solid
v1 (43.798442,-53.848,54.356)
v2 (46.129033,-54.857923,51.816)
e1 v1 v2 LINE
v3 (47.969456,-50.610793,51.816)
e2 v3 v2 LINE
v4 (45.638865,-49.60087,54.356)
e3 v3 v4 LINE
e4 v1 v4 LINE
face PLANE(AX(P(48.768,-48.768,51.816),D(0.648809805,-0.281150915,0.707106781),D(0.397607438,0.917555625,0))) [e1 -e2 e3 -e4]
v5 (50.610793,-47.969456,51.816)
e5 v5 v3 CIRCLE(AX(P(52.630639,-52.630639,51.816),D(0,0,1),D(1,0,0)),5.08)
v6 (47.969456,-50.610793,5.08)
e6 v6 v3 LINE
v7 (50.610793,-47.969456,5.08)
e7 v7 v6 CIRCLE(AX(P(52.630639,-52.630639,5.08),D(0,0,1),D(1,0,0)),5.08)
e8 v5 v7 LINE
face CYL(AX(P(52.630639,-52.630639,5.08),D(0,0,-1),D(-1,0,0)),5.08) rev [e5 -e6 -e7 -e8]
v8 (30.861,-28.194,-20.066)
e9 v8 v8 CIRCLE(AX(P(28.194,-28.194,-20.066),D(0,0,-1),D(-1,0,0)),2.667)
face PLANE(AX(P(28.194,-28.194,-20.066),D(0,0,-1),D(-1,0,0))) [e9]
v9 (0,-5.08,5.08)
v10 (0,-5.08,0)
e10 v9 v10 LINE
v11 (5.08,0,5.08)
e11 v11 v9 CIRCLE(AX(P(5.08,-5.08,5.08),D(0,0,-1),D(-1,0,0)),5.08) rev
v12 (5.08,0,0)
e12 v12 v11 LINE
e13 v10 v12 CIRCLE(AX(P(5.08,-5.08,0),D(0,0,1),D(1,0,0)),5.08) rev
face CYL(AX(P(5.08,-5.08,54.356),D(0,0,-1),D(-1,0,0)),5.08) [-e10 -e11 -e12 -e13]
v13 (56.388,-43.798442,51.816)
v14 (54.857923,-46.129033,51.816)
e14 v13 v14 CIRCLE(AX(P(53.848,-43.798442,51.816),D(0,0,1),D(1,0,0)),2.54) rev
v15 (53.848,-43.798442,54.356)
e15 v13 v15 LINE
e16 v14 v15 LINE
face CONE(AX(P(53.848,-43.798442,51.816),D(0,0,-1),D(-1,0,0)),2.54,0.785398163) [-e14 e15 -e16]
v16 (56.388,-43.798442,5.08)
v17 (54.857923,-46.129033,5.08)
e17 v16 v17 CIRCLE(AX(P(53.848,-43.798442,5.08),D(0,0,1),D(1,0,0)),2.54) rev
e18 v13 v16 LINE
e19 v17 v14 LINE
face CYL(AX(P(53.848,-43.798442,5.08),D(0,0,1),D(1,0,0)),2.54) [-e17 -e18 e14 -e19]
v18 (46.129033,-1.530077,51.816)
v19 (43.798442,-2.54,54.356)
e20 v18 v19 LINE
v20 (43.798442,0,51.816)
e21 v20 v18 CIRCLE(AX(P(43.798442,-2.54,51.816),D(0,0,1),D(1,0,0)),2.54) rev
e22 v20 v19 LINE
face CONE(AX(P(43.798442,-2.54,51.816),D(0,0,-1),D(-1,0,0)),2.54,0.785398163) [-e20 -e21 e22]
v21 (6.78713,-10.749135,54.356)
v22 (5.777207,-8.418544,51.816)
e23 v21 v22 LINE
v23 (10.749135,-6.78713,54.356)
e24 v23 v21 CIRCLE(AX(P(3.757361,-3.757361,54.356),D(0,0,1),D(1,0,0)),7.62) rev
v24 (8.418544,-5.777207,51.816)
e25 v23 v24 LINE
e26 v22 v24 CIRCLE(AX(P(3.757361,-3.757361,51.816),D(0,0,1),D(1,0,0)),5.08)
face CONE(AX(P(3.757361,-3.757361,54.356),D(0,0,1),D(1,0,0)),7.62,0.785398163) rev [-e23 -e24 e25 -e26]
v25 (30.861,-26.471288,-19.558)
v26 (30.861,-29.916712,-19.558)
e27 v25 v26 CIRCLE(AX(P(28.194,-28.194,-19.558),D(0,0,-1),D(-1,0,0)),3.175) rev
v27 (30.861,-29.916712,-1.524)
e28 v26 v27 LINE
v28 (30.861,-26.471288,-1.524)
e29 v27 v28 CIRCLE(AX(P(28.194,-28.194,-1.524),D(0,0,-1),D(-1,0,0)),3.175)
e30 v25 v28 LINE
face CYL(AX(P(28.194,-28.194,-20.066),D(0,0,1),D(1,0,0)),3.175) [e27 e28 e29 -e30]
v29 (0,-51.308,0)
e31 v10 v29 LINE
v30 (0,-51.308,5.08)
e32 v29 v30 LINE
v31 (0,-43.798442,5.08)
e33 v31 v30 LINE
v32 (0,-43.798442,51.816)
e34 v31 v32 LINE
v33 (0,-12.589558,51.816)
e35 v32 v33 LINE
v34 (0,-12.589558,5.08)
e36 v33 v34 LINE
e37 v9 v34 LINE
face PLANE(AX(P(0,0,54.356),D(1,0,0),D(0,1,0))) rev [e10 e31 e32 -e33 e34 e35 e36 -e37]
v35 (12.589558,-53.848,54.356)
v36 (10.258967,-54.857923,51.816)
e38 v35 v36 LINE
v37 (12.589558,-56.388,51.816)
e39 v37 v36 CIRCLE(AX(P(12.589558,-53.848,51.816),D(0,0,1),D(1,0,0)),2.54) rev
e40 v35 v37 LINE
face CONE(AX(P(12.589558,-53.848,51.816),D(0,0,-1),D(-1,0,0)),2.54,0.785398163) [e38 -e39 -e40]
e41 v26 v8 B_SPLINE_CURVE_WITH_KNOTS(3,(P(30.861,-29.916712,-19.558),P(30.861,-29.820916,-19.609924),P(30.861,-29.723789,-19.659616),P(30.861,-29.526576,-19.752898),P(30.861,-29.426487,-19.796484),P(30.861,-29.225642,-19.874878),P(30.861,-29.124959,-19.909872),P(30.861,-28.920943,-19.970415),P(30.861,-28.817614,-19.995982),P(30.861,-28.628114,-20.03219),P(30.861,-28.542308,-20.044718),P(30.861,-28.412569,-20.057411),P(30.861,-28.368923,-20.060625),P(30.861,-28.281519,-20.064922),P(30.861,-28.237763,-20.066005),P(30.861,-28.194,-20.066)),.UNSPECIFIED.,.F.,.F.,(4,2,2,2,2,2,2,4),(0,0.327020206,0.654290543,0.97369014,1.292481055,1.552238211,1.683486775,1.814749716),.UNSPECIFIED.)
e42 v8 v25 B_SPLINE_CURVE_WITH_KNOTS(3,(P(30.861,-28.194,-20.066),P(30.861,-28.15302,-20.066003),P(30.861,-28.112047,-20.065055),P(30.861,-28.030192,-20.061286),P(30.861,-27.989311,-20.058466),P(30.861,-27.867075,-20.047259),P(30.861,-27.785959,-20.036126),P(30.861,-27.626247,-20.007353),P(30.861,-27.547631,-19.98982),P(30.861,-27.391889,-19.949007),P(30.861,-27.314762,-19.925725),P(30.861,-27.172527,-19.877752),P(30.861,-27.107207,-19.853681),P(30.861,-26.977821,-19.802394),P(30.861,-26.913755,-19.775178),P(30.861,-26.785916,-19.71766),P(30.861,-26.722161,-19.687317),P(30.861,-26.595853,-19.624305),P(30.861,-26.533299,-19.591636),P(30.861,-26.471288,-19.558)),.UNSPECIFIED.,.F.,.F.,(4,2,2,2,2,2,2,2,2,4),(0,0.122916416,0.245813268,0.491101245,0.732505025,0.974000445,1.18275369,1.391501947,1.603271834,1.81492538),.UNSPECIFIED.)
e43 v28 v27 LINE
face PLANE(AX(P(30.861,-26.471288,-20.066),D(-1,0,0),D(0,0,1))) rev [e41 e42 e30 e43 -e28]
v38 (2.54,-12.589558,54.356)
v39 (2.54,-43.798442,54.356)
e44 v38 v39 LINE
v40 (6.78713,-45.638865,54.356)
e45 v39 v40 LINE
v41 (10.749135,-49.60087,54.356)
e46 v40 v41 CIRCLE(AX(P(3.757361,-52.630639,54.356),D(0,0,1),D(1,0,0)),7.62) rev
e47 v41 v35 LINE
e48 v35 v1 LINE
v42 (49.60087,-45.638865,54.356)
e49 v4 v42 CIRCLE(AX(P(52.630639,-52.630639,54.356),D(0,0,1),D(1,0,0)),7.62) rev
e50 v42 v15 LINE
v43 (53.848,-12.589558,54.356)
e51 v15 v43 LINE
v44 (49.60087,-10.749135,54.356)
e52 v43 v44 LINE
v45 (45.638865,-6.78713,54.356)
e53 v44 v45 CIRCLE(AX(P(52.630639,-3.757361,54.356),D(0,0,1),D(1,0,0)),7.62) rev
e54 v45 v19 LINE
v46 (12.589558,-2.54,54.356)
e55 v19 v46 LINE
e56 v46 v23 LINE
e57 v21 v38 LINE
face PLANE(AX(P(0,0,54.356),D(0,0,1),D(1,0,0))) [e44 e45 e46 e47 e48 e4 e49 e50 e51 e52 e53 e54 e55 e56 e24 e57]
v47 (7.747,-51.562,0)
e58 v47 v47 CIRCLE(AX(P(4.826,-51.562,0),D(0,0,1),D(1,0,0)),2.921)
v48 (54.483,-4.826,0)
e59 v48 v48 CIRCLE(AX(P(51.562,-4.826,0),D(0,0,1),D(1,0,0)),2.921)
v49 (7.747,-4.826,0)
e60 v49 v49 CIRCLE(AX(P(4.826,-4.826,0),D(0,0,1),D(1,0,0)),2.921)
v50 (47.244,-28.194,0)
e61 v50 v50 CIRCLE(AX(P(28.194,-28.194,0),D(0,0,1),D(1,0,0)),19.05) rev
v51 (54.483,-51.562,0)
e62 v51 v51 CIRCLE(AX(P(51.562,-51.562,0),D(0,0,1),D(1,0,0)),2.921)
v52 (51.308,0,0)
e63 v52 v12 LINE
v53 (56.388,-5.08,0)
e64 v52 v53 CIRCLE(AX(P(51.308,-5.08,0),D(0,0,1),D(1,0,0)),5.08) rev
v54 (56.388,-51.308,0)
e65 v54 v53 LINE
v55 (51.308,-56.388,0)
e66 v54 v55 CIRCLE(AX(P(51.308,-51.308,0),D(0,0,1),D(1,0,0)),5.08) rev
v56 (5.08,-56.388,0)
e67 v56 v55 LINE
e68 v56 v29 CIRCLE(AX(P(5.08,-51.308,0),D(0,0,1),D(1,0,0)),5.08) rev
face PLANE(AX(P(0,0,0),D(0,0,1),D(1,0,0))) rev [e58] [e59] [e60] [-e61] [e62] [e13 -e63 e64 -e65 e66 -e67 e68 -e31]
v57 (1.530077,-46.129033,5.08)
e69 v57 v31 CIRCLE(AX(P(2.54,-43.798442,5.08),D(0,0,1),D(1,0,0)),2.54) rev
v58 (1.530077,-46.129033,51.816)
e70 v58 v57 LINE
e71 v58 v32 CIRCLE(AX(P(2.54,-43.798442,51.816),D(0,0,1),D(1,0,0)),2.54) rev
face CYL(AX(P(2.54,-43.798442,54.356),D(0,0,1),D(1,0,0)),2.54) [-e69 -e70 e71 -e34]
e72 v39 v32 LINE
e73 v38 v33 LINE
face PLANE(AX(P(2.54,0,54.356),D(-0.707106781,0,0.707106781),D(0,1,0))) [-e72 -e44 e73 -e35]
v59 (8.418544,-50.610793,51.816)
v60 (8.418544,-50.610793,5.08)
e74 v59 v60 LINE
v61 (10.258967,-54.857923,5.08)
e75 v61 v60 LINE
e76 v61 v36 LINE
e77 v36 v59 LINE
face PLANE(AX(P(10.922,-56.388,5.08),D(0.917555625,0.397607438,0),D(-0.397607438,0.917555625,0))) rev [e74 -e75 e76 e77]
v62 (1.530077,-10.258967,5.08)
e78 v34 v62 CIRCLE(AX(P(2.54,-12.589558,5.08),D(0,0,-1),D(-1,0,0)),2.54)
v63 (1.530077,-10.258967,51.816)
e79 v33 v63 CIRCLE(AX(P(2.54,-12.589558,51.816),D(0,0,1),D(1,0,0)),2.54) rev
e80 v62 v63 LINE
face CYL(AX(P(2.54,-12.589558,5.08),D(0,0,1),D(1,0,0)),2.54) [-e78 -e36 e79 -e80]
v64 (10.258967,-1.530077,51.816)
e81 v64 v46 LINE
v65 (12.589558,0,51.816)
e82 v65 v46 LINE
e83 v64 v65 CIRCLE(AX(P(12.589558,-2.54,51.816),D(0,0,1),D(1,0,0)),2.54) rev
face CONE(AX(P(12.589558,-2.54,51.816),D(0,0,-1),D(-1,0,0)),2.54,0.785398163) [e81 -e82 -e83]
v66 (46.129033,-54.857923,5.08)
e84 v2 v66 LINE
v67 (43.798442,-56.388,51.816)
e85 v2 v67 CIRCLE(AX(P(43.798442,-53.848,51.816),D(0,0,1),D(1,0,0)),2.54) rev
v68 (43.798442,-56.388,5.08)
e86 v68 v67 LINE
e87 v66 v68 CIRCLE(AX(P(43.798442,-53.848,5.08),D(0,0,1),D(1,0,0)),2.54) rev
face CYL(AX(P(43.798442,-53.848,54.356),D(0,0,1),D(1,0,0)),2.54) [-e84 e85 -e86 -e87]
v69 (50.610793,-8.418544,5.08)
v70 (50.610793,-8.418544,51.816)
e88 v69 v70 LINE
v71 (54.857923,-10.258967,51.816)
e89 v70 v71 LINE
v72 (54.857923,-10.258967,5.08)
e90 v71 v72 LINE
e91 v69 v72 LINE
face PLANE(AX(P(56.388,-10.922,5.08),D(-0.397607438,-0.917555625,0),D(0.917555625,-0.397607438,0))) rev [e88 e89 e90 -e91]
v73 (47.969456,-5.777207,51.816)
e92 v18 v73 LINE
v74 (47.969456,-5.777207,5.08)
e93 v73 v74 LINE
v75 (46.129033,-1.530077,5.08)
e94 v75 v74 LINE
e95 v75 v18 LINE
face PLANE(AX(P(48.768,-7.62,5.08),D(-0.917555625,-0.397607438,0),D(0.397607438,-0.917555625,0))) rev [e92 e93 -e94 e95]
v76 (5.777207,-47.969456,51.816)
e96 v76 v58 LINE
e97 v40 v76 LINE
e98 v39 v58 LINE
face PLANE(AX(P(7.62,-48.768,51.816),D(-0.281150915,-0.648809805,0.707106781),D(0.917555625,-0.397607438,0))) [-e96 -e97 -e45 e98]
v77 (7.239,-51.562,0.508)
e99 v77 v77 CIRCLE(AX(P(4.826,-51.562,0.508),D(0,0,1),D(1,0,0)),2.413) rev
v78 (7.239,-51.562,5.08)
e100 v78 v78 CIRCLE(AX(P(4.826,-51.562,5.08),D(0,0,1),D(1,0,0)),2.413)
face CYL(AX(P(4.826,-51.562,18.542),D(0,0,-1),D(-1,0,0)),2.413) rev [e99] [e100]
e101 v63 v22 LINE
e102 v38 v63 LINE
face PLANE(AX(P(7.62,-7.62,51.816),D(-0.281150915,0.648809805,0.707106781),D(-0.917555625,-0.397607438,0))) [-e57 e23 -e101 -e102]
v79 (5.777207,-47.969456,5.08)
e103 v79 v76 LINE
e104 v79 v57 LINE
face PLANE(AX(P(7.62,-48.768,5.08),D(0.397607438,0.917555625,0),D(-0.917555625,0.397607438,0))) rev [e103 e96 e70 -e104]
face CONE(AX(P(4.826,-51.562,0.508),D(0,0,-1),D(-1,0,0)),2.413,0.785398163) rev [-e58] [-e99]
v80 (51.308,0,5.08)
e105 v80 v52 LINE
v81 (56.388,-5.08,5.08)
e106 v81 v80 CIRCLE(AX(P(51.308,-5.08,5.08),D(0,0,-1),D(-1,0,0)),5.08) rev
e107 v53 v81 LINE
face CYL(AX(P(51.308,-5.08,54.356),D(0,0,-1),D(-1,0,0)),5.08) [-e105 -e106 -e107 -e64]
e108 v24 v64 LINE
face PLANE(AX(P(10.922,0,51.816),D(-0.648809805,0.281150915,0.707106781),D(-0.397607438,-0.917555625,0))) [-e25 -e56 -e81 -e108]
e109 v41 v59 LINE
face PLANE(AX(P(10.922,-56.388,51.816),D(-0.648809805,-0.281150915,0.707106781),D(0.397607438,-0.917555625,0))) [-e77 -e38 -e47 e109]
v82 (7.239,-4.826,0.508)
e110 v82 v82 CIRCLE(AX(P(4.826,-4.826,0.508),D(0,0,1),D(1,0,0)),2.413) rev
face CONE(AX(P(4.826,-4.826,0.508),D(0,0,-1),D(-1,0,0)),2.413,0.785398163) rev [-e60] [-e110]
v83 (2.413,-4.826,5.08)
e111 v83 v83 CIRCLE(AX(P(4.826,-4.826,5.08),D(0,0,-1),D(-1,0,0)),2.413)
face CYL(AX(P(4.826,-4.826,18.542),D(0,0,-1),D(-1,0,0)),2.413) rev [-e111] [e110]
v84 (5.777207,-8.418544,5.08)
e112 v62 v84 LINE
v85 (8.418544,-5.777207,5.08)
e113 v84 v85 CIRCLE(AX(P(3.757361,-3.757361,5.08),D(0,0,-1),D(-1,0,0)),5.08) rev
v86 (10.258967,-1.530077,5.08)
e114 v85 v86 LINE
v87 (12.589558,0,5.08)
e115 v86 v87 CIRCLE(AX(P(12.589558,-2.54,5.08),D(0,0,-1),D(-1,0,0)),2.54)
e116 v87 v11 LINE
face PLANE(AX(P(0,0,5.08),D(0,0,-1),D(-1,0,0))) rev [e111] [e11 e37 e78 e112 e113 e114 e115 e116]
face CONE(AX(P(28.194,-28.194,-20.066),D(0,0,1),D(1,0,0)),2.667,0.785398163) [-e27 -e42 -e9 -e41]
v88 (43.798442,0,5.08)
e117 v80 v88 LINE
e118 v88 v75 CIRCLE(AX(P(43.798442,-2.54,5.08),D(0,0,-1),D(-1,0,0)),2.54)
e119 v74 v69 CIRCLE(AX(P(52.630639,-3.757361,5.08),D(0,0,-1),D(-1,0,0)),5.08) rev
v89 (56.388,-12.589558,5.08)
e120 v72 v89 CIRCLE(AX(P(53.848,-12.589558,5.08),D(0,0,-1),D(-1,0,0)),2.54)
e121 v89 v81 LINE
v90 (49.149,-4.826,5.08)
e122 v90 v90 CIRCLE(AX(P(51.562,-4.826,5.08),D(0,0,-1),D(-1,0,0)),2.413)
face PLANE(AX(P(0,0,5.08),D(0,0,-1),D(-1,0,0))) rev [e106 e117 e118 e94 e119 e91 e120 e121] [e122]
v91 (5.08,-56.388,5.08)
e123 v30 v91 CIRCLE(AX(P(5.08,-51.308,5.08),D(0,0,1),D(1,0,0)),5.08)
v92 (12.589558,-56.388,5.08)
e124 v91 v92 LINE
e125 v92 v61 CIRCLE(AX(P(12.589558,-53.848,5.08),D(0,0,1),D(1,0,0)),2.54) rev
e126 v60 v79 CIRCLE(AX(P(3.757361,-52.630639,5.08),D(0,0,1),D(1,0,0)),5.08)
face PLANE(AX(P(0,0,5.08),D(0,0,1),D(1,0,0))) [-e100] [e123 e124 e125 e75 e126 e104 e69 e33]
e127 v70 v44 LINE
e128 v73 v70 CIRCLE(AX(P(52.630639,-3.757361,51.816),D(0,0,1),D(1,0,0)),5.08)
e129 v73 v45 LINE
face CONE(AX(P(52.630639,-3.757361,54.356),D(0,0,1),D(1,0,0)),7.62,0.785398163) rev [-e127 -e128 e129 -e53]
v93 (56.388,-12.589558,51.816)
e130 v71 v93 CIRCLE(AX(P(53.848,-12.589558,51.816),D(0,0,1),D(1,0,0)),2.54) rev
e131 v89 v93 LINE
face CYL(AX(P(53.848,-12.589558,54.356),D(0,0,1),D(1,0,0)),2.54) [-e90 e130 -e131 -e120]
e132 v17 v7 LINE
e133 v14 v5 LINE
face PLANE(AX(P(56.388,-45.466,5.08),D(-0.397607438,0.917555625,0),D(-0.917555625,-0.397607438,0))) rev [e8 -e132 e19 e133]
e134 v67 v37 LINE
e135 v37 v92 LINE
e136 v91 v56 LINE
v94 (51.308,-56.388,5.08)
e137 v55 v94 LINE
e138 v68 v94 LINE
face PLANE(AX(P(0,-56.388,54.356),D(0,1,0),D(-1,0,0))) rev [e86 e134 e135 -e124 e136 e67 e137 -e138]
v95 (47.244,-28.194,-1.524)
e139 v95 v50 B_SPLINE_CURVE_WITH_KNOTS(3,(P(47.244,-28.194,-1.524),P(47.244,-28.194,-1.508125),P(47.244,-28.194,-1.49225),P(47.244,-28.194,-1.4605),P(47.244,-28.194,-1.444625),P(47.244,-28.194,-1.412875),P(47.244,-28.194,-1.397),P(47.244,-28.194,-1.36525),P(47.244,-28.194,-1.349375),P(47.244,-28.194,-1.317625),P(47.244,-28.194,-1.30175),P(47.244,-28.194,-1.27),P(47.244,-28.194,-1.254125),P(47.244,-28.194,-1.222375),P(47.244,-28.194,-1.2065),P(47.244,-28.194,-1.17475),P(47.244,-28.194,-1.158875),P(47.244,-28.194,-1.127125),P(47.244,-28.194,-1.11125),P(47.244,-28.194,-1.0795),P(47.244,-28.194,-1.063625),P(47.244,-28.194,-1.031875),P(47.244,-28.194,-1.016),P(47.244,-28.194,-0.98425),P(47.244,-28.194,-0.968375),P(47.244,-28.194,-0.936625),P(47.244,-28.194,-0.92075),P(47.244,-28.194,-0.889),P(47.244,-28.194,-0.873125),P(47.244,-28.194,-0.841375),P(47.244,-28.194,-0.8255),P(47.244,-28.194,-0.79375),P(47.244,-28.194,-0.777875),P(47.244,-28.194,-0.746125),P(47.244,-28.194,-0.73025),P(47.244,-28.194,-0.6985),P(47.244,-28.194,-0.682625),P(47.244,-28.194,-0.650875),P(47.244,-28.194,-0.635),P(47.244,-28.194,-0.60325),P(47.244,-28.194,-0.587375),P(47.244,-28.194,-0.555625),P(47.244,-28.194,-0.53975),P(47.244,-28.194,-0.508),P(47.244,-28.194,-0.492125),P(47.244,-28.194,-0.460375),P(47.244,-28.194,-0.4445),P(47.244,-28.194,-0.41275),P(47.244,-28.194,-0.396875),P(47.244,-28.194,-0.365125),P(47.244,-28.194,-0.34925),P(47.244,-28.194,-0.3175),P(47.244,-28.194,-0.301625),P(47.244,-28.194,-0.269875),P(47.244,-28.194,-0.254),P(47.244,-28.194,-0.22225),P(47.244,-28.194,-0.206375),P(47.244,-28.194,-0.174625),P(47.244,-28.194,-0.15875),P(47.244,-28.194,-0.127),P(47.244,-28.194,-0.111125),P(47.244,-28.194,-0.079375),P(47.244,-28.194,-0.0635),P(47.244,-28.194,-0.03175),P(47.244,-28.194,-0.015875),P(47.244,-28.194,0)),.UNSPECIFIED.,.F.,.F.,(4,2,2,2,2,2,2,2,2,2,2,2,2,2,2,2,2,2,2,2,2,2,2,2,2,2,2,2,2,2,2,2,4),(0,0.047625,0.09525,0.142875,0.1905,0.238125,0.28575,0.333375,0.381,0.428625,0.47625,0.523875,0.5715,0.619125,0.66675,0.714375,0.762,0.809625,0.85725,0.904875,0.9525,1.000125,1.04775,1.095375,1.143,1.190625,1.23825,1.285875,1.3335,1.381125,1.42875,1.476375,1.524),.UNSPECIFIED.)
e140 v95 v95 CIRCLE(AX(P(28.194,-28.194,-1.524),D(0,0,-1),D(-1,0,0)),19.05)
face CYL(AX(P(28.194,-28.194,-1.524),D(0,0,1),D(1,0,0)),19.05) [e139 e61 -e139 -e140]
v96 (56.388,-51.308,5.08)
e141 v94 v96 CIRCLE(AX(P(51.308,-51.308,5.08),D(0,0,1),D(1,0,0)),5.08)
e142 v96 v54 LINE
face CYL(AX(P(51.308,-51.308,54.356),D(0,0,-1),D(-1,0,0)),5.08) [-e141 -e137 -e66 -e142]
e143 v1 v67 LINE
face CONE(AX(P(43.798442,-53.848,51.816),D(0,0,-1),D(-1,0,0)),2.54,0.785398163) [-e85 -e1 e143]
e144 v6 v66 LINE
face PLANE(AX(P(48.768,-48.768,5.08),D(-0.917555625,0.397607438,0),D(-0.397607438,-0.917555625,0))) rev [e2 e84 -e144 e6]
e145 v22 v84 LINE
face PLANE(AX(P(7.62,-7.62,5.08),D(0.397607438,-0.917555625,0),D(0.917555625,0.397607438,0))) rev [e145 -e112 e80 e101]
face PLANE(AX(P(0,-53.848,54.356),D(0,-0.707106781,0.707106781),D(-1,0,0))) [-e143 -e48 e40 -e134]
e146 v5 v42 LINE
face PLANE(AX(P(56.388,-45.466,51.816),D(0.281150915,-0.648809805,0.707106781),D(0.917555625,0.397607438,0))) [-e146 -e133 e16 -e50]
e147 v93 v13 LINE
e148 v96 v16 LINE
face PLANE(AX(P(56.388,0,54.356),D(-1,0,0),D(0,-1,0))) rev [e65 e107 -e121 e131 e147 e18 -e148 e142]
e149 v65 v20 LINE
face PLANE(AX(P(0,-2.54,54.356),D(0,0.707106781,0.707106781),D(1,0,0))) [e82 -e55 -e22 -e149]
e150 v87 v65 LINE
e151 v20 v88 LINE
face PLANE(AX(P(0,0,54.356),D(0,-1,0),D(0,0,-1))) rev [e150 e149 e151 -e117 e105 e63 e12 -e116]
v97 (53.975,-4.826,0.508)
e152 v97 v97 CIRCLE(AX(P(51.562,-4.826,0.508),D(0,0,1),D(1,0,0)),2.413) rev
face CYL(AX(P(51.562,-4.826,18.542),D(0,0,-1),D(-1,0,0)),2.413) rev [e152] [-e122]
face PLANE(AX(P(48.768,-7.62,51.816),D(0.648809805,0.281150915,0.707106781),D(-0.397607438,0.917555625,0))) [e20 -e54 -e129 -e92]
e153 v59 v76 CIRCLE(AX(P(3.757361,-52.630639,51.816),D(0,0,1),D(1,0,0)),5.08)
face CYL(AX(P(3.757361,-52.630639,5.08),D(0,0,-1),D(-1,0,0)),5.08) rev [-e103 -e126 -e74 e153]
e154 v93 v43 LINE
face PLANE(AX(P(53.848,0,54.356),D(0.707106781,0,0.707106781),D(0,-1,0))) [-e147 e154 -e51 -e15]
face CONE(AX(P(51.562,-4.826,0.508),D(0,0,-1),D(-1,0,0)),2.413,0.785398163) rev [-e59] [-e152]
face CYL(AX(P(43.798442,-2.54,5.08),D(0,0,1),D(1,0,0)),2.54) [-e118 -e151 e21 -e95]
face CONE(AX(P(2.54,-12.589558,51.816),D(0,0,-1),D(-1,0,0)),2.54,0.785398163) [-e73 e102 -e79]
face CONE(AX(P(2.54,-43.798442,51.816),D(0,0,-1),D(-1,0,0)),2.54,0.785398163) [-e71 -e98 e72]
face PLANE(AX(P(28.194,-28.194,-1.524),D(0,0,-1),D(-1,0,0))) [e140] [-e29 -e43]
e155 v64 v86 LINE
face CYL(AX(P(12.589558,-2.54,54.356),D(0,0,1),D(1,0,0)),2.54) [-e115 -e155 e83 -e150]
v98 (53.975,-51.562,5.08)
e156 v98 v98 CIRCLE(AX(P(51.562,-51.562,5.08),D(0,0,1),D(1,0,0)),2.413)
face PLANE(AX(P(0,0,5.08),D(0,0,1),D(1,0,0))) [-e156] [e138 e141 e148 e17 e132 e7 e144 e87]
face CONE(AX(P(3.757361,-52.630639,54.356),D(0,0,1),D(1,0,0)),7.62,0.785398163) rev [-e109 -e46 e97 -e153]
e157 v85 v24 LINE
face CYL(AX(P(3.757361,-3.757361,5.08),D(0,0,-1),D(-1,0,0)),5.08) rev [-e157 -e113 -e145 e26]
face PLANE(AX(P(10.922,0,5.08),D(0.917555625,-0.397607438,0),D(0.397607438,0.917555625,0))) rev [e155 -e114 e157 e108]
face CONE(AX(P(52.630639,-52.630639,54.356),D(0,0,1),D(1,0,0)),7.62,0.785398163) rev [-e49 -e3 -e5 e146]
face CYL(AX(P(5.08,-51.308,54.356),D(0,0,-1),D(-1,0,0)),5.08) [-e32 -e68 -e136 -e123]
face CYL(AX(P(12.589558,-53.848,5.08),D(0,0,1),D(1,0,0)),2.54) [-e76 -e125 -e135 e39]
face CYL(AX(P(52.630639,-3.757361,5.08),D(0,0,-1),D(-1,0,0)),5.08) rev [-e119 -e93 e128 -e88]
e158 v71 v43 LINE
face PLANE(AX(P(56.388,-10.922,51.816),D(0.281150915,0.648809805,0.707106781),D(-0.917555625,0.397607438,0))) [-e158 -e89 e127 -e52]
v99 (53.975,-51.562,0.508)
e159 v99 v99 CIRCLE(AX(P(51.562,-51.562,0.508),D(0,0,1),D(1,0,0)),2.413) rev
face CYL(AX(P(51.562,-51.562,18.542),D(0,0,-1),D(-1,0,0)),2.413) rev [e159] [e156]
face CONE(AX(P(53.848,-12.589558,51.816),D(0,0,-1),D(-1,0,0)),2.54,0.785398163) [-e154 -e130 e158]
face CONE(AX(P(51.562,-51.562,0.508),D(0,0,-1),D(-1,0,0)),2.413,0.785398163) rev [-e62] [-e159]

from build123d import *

# Parameters (mm, degrees)
SKETCH1_W           = 56.388
SKETCH1_H           = 56.388
BOSS_EXTRUDE1_DEPTH = 54.356
CUT_EXTRUDE1_DEPTH  = 49.276
FILLET2_R           = 5.08
FILLET3_R           = 2.54
SKETCH6_R           = 19.05
BOSS_EXTRUDE2_DEPTH = 1.524
BOSS_EXTRUDE3_DEPTH = 18.542
SKETCH10_R          = 2.413
CUT_EXTRUDE2_DEPTH  = 18.542
CHAMFER1_SIZE       = 0.508
CHAMFER2_SIZE       = 0.508
CHAMFER3_SIZE       = 2.54


with BuildPart() as part:
    # Sketch1 → Boss-Extrude1 (new body)
    with BuildSketch(Plane.XY):
        with Locations((28.194, -28.194)):
            Rectangle(SKETCH1_W, SKETCH1_H)
    extrude(amount=BOSS_EXTRUDE1_DEPTH)

    # Sketch3 → Cut-Extrude1 (cut)
    with BuildSketch(Plane.XY.offset(54.356)):
        Polygon((0, 0), (10.922, 0), (7.62, -7.62), (0, -10.922), align=None)
        Polygon((56.388, 0), (56.388, -10.922), (48.768, -7.62), (45.466, 0), align=None)
        Polygon((0, -56.388), (10.922, -56.388), (7.62, -48.768), (0, -45.466), align=None)
        Polygon((56.388, -56.388), (56.388, -45.466), (48.768, -48.768), (45.466, -56.388), align=None)
    extrude(amount=-CUT_EXTRUDE1_DEPTH, mode=Mode.SUBTRACT)

    # Fillet2
    fillet2_edges = [part.edges().sort_by_distance(p)[0] for p in [
        (0, 0, 2.54),
        (7.62, -7.62, 29.718),
        (56.388, 0, 2.54),
        (48.768, -7.62, 29.718),
        (0, -56.388, 2.54),
        (7.62, -48.768, 29.718),
        (56.388, -56.388, 2.54),
        (48.768, -48.768, 29.718),
    ]]
    fillet(fillet2_edges, radius=FILLET2_R)

    # Fillet3
    fillet3_edges = [part.edges().sort_by_distance(p)[0] for p in [
        (0, -10.922, 29.718),
        (10.922, 0, 29.718),
        (45.466, 0, 29.718),
        (56.388, -10.922, 29.718),
        (0, -45.466, 29.718),
        (10.922, -56.388, 29.718),
        (45.466, -56.388, 29.718),
        (56.388, -45.466, 29.718),
    ]]
    fillet(fillet3_edges, radius=FILLET3_R)

    # Sketch6 → Boss-Extrude2 (add)
    with BuildSketch(Plane(origin=(0, 0, 0), x_dir=(-1, 0, 0), z_dir=(0, 0, -1))):
        with Locations(Location((-28.194, -28.194, 0), (0, 0, 180))):
            Circle(SKETCH6_R)
    extrude(amount=BOSS_EXTRUDE2_DEPTH)

    # Sketch8 → Boss-Extrude3 (add)
    with BuildSketch(Plane(origin=(0, 0, -1.524), x_dir=(-1, 0, 0), z_dir=(0, 0, -1))):
        with BuildLine():
            Line((-30.861, -26.471288184), (-30.861, -29.916711816))
            ThreePointArc((-30.861, -29.916711816), (-25.019, -28.194), (-30.861, -26.471288184))
        make_face()
    extrude(amount=BOSS_EXTRUDE3_DEPTH)

    # Sketch10 → Cut-Extrude2 (cut)
    with BuildSketch(Plane(origin=(0, 0, 0), x_dir=(-1, 0, 0), z_dir=(0, 0, -1))):
        with Locations((-51.562, -4.826)):
            Circle(SKETCH10_R)
        with Locations((-4.826, -4.826)):
            Circle(SKETCH10_R)
        with Locations((-51.562, -51.562)):
            Circle(SKETCH10_R)
        with Locations((-4.826, -51.562)):
            Circle(SKETCH10_R)
    extrude(amount=-CUT_EXTRUDE2_DEPTH, mode=Mode.SUBTRACT)

    # Chamfer1
    chamfer1_edges = [part.edges().sort_by_distance(p)[0] for p in [
        (53.975, -4.826, 0),
        (7.239, -4.826, 0),
        (53.975, -51.562, 0),
        (7.239, -51.562, 0),
    ]]
    chamfer(chamfer1_edges, length=CHAMFER1_SIZE)

    # Chamfer2
    chamfer2_edges = [part.edges().sort_by_distance(p)[0] for p in [
        (25.019, -28.194, -20.066),
    ]]
    chamfer(chamfer2_edges, length=CHAMFER2_SIZE - 0.0001)  # a hair under: the kernel refuses the full size

    # Chamfer3
    chamfer3_edges = [part.edges().sort_by_distance(p)[0] for p in [
        (47.049244866, -3.653641998, 54.356),
        (52.734358002, -47.049244866, 54.356),
        (56.388, -28.194, 54.356),
        (28.194, 0, 54.356),
        (3.653641998, -9.338755134, 54.356),
        (0, -28.194, 54.356),
        (9.338755134, -52.734358002, 54.356),
        (28.194, -56.388, 54.356),
        (0.416700193, -11.19557153, 54.356),
        (11.19557153, -0.416700193, 54.356),
        (0.416700193, -45.19242847, 54.356),
        (11.19557153, -55.971299807, 54.356),
        (45.19242847, -55.971299807, 54.356),
        (55.971299807, -45.19242847, 54.356),
        (55.971299807, -11.19557153, 54.356),
        (45.19242847, -0.416700193, 54.356),
        (3.653641998, -47.049244866, 54.356),
        (47.049244866, -52.734358002, 54.356),
        (52.734358002, -9.338755134, 54.356),
        (9.338755134, -3.653641998, 54.356),
        (7.349463554, -49.038536446, 54.356),
        (49.038536446, -49.038536446, 54.356),
        (49.038536446, -7.349463554, 54.356),
        (7.349463554, -7.349463554, 54.356),
    ]]
    chamfer(chamfer3_edges, length=CHAMFER3_SIZE)


solid = part.part
